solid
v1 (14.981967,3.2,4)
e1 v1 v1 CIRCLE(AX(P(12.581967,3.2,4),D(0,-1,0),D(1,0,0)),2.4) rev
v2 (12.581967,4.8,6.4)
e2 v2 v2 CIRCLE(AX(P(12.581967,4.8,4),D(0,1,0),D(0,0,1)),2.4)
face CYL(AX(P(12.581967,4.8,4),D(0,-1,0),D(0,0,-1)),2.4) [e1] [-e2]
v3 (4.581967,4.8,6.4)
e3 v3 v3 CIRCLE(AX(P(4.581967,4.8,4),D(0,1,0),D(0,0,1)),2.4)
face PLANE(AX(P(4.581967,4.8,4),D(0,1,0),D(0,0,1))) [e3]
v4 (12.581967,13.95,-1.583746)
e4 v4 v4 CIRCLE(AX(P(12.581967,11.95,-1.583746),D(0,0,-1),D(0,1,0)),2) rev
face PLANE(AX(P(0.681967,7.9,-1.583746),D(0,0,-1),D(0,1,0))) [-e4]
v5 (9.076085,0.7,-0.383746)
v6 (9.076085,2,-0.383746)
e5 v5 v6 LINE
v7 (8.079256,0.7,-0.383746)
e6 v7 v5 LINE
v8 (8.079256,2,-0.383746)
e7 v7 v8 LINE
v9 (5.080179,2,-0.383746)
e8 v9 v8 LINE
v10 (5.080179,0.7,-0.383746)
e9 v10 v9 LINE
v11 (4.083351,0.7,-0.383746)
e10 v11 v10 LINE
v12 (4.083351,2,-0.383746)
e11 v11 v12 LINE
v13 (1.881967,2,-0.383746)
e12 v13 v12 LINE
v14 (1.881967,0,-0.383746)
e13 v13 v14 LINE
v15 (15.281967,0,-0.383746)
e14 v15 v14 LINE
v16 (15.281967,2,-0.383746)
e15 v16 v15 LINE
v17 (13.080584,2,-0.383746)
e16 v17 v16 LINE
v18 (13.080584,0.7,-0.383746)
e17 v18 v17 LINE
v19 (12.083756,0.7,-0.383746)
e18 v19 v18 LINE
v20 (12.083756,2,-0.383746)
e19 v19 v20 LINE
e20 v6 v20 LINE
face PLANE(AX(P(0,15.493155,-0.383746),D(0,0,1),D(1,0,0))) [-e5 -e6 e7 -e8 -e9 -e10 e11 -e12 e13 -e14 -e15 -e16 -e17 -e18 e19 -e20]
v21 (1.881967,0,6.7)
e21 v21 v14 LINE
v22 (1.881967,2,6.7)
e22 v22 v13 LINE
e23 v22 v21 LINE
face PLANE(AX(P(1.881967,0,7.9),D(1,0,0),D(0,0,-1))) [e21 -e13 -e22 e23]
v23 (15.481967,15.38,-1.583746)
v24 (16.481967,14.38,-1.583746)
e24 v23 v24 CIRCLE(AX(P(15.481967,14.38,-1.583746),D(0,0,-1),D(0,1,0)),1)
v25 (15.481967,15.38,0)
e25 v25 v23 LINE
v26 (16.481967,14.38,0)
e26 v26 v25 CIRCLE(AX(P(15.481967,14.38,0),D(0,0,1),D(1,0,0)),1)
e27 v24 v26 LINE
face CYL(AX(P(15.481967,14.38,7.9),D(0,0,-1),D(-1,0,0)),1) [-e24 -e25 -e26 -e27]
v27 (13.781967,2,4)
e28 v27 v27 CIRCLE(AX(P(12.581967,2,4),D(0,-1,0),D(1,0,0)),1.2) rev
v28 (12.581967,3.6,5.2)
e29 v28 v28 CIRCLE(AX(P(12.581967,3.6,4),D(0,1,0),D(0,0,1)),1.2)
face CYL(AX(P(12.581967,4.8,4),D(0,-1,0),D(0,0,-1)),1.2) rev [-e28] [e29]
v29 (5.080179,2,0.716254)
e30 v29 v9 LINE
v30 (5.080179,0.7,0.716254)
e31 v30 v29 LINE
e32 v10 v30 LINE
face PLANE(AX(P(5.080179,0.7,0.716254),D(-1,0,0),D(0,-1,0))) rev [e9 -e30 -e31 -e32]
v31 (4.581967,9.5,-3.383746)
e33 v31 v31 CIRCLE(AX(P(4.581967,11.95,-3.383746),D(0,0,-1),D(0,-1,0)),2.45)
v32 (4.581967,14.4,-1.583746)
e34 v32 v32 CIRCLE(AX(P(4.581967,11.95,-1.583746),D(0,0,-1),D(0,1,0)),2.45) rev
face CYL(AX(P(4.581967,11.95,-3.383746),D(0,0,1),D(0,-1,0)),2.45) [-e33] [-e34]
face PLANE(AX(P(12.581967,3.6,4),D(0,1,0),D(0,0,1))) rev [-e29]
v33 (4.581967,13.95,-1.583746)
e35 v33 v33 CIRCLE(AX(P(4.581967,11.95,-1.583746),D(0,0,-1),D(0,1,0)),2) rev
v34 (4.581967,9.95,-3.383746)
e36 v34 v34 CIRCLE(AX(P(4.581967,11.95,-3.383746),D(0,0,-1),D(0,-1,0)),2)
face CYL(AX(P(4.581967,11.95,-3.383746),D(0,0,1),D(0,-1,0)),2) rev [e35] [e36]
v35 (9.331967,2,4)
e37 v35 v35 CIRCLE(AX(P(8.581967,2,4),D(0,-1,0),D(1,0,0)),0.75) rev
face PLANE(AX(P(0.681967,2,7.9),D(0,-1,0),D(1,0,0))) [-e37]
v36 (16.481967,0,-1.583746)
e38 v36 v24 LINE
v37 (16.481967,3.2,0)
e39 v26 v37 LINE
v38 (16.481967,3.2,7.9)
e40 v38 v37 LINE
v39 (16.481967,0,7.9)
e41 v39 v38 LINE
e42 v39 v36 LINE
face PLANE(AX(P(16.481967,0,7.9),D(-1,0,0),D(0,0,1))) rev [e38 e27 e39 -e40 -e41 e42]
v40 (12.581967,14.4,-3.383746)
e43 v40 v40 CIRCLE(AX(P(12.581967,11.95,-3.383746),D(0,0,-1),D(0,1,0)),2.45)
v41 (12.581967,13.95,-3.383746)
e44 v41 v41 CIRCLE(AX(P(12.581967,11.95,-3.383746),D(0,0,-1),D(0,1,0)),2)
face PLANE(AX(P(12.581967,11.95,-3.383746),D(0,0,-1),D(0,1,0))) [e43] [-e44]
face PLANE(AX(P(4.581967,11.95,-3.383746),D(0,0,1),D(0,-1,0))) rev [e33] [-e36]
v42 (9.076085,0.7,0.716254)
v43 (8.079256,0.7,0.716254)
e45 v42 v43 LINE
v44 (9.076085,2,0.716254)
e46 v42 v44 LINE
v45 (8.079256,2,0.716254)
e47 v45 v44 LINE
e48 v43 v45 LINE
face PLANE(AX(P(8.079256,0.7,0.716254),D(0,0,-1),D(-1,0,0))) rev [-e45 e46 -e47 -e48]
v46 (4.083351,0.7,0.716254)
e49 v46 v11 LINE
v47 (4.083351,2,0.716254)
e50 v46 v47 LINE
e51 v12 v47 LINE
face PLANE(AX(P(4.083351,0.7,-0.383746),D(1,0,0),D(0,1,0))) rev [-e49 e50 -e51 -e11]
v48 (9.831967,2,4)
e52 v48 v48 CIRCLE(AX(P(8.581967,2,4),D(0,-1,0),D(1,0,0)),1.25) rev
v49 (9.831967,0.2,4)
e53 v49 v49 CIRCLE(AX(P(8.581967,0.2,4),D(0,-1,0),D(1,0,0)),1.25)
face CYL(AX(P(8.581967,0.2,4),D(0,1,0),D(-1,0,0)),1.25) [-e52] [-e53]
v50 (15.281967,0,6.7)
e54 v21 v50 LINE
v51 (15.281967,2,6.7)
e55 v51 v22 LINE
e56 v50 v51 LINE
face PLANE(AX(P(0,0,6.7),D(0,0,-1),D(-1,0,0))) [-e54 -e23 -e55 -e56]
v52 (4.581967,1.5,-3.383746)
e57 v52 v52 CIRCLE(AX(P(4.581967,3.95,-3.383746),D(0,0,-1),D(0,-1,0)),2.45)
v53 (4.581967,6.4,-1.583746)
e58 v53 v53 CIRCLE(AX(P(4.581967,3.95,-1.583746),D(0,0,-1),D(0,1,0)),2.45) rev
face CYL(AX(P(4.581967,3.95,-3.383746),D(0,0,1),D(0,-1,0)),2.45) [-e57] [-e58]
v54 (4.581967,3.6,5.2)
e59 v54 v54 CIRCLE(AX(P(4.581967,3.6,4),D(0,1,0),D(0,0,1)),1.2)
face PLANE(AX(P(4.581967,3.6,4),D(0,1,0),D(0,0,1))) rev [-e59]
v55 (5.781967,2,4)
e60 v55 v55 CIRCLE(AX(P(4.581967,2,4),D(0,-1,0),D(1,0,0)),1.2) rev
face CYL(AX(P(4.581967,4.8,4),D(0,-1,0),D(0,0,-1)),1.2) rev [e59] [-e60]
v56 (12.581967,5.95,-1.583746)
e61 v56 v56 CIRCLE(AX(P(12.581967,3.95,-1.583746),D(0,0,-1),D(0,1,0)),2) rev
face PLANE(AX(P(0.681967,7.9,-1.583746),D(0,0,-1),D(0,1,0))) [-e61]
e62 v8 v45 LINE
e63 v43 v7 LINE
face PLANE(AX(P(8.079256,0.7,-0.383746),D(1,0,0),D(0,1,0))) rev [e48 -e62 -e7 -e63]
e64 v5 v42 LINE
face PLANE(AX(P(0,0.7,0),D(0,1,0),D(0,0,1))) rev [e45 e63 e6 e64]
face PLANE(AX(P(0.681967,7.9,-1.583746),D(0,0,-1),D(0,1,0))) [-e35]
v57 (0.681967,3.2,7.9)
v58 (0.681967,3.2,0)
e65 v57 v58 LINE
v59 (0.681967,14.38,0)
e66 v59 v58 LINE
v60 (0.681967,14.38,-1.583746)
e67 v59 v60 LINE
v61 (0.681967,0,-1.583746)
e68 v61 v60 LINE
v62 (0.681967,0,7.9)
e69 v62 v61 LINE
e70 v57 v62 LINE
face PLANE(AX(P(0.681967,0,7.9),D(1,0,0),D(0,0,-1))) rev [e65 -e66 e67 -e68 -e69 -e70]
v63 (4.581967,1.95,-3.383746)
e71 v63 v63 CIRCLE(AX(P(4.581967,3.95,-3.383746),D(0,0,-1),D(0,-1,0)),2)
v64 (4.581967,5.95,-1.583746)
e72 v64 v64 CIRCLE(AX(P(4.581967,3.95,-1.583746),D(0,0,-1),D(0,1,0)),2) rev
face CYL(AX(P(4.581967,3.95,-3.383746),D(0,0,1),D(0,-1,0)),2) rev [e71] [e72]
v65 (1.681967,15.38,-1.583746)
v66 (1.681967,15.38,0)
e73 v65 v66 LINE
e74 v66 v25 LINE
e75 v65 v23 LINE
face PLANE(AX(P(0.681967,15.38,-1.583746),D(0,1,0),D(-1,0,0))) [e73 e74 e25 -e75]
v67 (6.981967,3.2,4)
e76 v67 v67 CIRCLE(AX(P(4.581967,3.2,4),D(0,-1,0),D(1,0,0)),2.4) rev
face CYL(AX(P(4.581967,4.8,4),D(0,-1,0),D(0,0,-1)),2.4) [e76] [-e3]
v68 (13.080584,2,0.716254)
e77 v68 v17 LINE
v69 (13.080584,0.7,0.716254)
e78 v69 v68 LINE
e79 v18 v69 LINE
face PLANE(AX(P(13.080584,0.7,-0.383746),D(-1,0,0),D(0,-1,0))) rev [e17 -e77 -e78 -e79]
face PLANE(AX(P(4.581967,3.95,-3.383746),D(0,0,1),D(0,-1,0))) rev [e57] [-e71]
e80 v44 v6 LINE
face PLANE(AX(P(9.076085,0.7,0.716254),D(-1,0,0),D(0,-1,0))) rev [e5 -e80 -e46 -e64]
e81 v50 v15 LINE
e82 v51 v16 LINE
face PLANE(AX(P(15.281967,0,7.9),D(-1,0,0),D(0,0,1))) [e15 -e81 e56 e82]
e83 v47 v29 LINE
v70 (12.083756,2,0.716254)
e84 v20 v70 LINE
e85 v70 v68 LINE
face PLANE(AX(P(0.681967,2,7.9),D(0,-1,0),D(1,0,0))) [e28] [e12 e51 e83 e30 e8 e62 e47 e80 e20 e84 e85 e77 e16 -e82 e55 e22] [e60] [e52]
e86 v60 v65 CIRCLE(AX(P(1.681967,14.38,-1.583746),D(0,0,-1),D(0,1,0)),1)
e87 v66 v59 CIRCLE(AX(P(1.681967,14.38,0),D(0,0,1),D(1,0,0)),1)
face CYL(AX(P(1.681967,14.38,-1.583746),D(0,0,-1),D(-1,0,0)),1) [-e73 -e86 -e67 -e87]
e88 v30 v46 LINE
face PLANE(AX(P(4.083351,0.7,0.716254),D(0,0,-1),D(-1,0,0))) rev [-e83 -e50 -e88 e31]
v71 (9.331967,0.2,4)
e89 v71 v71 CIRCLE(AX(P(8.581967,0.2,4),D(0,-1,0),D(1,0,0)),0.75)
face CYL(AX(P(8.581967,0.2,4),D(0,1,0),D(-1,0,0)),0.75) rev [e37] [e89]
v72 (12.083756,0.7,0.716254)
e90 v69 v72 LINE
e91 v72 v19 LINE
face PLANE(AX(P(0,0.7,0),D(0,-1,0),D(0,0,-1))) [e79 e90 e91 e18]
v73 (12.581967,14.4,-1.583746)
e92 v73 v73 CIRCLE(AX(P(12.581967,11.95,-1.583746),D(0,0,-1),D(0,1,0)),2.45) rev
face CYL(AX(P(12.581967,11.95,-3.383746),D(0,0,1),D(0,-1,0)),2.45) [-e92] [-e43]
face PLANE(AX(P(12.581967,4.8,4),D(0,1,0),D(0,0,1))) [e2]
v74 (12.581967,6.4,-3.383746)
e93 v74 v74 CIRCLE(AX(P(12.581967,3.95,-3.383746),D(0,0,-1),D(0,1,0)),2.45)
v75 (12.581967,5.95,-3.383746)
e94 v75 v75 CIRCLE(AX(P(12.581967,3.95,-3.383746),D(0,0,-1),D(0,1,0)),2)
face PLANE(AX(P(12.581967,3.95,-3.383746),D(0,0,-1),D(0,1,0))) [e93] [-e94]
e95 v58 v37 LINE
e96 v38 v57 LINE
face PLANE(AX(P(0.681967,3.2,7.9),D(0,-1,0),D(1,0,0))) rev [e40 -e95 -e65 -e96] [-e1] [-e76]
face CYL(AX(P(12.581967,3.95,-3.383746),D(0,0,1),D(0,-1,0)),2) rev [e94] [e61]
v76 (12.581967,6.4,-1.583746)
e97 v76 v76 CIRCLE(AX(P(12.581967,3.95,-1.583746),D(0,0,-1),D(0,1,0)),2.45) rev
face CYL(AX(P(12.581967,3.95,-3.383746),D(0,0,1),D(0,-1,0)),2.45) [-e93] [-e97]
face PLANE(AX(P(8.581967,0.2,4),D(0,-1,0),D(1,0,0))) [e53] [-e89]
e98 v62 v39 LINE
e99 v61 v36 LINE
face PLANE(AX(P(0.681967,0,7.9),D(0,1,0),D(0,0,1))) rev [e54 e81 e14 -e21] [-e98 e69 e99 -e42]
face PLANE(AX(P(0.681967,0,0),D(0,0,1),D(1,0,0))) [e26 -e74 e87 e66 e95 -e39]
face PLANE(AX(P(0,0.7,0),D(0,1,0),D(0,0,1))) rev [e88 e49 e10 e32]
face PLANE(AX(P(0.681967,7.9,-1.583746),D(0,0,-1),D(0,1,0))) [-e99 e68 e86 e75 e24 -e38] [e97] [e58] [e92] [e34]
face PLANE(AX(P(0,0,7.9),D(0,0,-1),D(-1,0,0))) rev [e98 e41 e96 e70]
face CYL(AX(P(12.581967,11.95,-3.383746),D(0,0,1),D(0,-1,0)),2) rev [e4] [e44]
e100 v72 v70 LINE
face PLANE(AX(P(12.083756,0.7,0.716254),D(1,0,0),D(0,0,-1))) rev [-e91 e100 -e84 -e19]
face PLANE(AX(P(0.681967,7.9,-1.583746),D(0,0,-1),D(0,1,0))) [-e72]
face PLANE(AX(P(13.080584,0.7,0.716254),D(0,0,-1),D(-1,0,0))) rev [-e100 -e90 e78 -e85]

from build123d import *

# Parameters (mm, degrees)
MAINBASESKETCH_W                       = 15.8
MAINBASESKETCH_H                       = 3.2
MAINBASEEXTRUDE_DEPTH                  = 7.9
STUDSSKETCH_R                          = 2.4
STUDSEXTRUDE_DEPTH                     = 1.6
STUDSPATTERN_COUNT                     = 2
STUDSPATTERN_PITCH                     = 8
STUDSPATTERN_COUNT_DIR2                = 2
STUDSPATTERN_PITCH_DIR2                = 8
MAINBASESHELL_T                        = -1.2
LCUTBLUE_DEPTH                         = 19.555463972
LCUTBLUE_DEPTH_BACK                    = 19.555463972
CUTADDEDTOLCUT_DEPTH                   = 2
MADESLIMCUTSKETCH_W                    = 7.9
MADESLIMCUTSKETCH_H                    = 7.9
MADESLIMCUT_DEPTH                      = 19.897228453
MADESLIMFILLEXT_REACH                  = 20.897
SKETCH33_W                             = 5.500952983
SKETCH33_H                             = 1.199047018
SLIMHOLEEXT_START                      = -0.2
SLIMHOLESKETCH_R                       = 1.25
SLIMHOLESKETCH_R_2                     = 0.75
SLIMHOLEEXT_DEPTH                      = 2
ANGLEDSLIMBASESWEEP_START              = 0.681967213
ANGLEDSLIMBASESWEEP_OUTLINE_W          = 7.9
ANGLEDSLIMBASESWEEP_OUTLINE_H          = 1.583745828
ANGLEDSLIMBASESWEEP_DEPTH              = 15.8
SHORTLEXTENDEDCUT_START                = -2
SHORTLEXTENDEDCUTSKETCH_W              = 13.4
SHORTLEXTENDEDCUTSKETCH_H              = 1.582792846
SHORTLEXTENDEDCUT_DEPTH                = 2
SHORTLUNDERSTUMPS_START                = -0.2
SHORTLUNDERSTUMPSKETCH_W               = 0.996828098
SHORTLUNDERSTUMPSKETCH_H               = 1.1
SHORTLUNDERSTUMPS_DEPTH                = 1.5
SHORTLUPPERCIRCLES_START               = -0.2
SHORTLUPPERCIRCLESSKETCH_R             = 2.45
SHORTLUPPERCIRCLESSKETCH_R_2           = 2
SHORTLUPPERCIRCLES_DEPTH               = 2
HOLESBASEHOLESHORT_START               = 0.681967213
HOLESBASEHOLESHORT_OUTLINE_W           = 7.48
HOLESBASEHOLESHORT_OUTLINE_H           = 1.583745828
HOLESBASEHOLESHORT_DEPTH               = 15.8
F_4UPPERCIRCLESTALLERLBASE_START       = -3.383745828
F_4UPPERCIRCLESTALLERLBASE_OUTLINE_R   = 2.45
F_4UPPERCIRCLESTALLERLBASE_OUTLINE_R_2 = 2
F_4UPPERCIRCLESTALLERLBASE_DEPTH       = 1.8
TALLERLBASEOUTERCHAMFER_R              = 1


# Read off the part's stored shape, not the designer's step: AngledSlimBaseSweep, HolesBaseHoleShort, 4UpperCirclesTallerLBase
with BuildPart() as part:
    # MainBaseSketch → MainBaseExtrude (new, symmetric)
    with BuildSketch(Plane.XY):
        with Locations((8.581967213, 1.6)):
            Rectangle(MAINBASESKETCH_W, MAINBASESKETCH_H)
    extrude(amount=MAINBASEEXTRUDE_DEPTH, both=True)

    # StudsSketch → StudsExtrude (add)
    with BuildSketch(Plane(origin=(0, 3.2, 0), x_dir=(1, 0, 0), z_dir=(0, 1, 0))):
        with Locations((4.581967213, 4)):
            Circle(STUDSSKETCH_R)
    studsextrude = extrude(amount=STUDSEXTRUDE_DEPTH)

    # StudsPattern: StudsExtrude 2 × 2
    with Locations(*[(j * STUDSPATTERN_PITCH_DIR2, 0, i * STUDSPATTERN_PITCH) for i in range(STUDSPATTERN_COUNT) for j in range(STUDSPATTERN_COUNT_DIR2) if (i, j) != (0, 0)]):
        add(studsextrude)

    # MainBaseShell
    mainbaseshell_openings = [part.faces().sort_by_distance(p)[0] for p in [
        (8.581967213, 0, 0),
    ]]
    offset(amount=MAINBASESHELL_T, openings=mainbaseshell_openings, kind=Kind.INTERSECTION)

    # LCUTBlueSketch → LCutBlue (cut, two sides: drawn at the far end of the back side and taken through both)
    with BuildSketch(Plane(origin=(0, 3.2, 0), x_dir=(1, 0, 0), z_dir=(0, 1, 0)).offset(-LCUTBLUE_DEPTH_BACK)):
        Polygon((8.581967213, 53.229874044), (8.581967213, 7.9), (8.581967213, 0), (16.481967213, 0), (61.811841258, 0), (125.917963912, 64.106122654), (72.688089868, 117.335996699), align=None)
    extrude(amount=LCUTBLUE_DEPTH + LCUTBLUE_DEPTH_BACK, mode=Mode.SUBTRACT)

    # CutAddedtoLSketch → CutAddedToLCut (add)
    with BuildSketch(Plane.XZ):
        Polygon((7.382920196, -6.7), (8.581967213, -6.7), (8.581967213, 0), (15.281967213, 0), (15.281967213, 1.199047018), (7.382920196, 1.199047018), (7.382920196, 0), align=None)
    extrude(amount=-CUTADDEDTOLCUT_DEPTH)

    # MadeSlimCutSketch → MadeSlimCut (cut, through all)
    with BuildSketch(Plane.XZ):
        with Locations((4.631967213, -3.95)):
            Rectangle(MADESLIMCUTSKETCH_W, MADESLIMCUTSKETCH_H)
    extrude(amount=-MADESLIMCUT_DEPTH, mode=Mode.SUBTRACT)

    # Sketch33 → MadeSlimFillExt (add, up to next)
    with BuildSketch(Plane.XZ, mode=Mode.PRIVATE) as madeslimfillext_sk1:
        with Locations((4.632443704, 0.599523509)):
            Rectangle(SKETCH33_W, SKETCH33_H)
    madeslimfillext_tool1 = extrude(madeslimfillext_sk1.sketch, amount=-MADESLIMFILLEXT_REACH, mode=Mode.PRIVATE) - part.part
    add(madeslimfillext_tool1.solids().sort_by_distance((4.632444, 0, 0.599524))[0])

    # SlimHoleSketch → SlimHoleExt (add)
    with BuildSketch(Plane.XZ.offset(-2).offset(SLIMHOLEEXT_START)):
        with Locations((8.581967213, 4)):
            Circle(SLIMHOLESKETCH_R)
        with Locations((8.581967213, 4)):
            Circle(SLIMHOLESKETCH_R_2, mode=Mode.SUBTRACT)
    extrude(amount=SLIMHOLEEXT_DEPTH)

    # AngledSlimBaseSweep outline → AngledSlimBaseSweep (add)
    with BuildSketch(Plane.YZ.offset(ANGLEDSLIMBASESWEEP_START)):
        with Locations((3.95, -0.791872914)):
            Rectangle(ANGLEDSLIMBASESWEEP_OUTLINE_W, ANGLEDSLIMBASESWEEP_OUTLINE_H)
    extrude(amount=ANGLEDSLIMBASESWEEP_DEPTH)

    # ShortLExtendedCutSketch → ShortLExtendedCut (cut)
    with BuildSketch(Plane.XZ.offset(SHORTLEXTENDEDCUT_START)):
        with Locations((8.581967213, 0.407650595)):
            Rectangle(SHORTLEXTENDEDCUTSKETCH_W, SHORTLEXTENDEDCUTSKETCH_H)
    extrude(amount=SHORTLEXTENDEDCUT_DEPTH, mode=Mode.SUBTRACT)

    # ShortLUnderStumpSketch → ShortLUnderStumps (add)
    with BuildSketch(Plane.XZ.offset(-2).offset(SHORTLUNDERSTUMPS_START)):
        with Locations((4.581764801, 0.166254172)):
            Rectangle(SHORTLUNDERSTUMPSKETCH_W, SHORTLUNDERSTUMPSKETCH_H)
        with Locations((8.57767054, 0.166254172)):
            Rectangle(SHORTLUNDERSTUMPSKETCH_W, SHORTLUNDERSTUMPSKETCH_H)
        with Locations((12.582169625, 0.166254172)):
            Rectangle(SHORTLUNDERSTUMPSKETCH_W, SHORTLUNDERSTUMPSKETCH_H)
    extrude(amount=SHORTLUNDERSTUMPS_DEPTH)

    # ShortLUpperCirclesSketch → ShortLUpperCircles (add)
    # profile 1 of 2: a face of its own
    with BuildSketch(Plane(origin=(0, 0, -1.583745828), x_dir=(-1, 0, 0), z_dir=(0, 0, -1)).offset(SHORTLUPPERCIRCLES_START)):
        with Locations(Location((-12.581967213, 3.95, 0), (0, 0, 90))):
            Circle(SHORTLUPPERCIRCLESSKETCH_R)
        with Locations(Location((-12.581967213, 3.95, 0), (0, 0, 90))):
            Circle(SHORTLUPPERCIRCLESSKETCH_R_2, mode=Mode.SUBTRACT)
    # profile 2 of 2: a face of its own
    with BuildSketch(Plane(origin=(0, 0, -1.583745828), x_dir=(-1, 0, 0), z_dir=(0, 0, -1)).offset(SHORTLUPPERCIRCLES_START)):
        with Locations(Location((-4.581967213, 3.95, 0), (0, 0, 270))):
            Circle(SHORTLUPPERCIRCLESSKETCH_R)
        with Locations(Location((-4.581967213, 3.95, 0), (0, 0, 270))):
            Circle(SHORTLUPPERCIRCLESSKETCH_R_2, mode=Mode.SUBTRACT)
    extrude(amount=SHORTLUPPERCIRCLES_DEPTH)

    # HolesBaseHoleShort outline → HolesBaseHoleShort (add)
    with BuildSketch(Plane.YZ.offset(HOLESBASEHOLESHORT_START)):
        with Locations((11.64, -0.791872914)):
            Rectangle(HOLESBASEHOLESHORT_OUTLINE_W, HOLESBASEHOLESHORT_OUTLINE_H)
    extrude(amount=HOLESBASEHOLESHORT_DEPTH)

    # 4UpperCirclesTallerLBase outline → 4UpperCirclesTallerLBase (add)
    # profile 1 of 2: a face of its own
    with BuildSketch(Plane.XY.offset(F_4UPPERCIRCLESTALLERLBASE_START)):
        with Locations((4.581967213, 11.95)):
            Circle(F_4UPPERCIRCLESTALLERLBASE_OUTLINE_R)
        with Locations((4.581967213, 11.95)):
            Circle(F_4UPPERCIRCLESTALLERLBASE_OUTLINE_R_2, mode=Mode.SUBTRACT)
    # profile 2 of 2: a face of its own
    with BuildSketch(Plane.XY.offset(F_4UPPERCIRCLESTALLERLBASE_START)):
        with Locations((12.581967213, 11.95)):
            Circle(F_4UPPERCIRCLESTALLERLBASE_OUTLINE_R)
        with Locations((12.581967213, 11.95)):
            Circle(F_4UPPERCIRCLESTALLERLBASE_OUTLINE_R_2, mode=Mode.SUBTRACT)
    extrude(amount=F_4UPPERCIRCLESTALLERLBASE_DEPTH)

    # TallerLBaseOuterChamfer
    tallerlbaseouterchamfer_edges = [part.edges().sort_by_distance(p)[0] for p in [
        (16.481967213, 15.38, -0.791872914),
        (0.681967213, 15.38, -0.791872914),
    ]]
    fillet(tallerlbaseouterchamfer_edges, radius=TALLERLBASEOUTERCHAMFER_R)


solid = part.part
